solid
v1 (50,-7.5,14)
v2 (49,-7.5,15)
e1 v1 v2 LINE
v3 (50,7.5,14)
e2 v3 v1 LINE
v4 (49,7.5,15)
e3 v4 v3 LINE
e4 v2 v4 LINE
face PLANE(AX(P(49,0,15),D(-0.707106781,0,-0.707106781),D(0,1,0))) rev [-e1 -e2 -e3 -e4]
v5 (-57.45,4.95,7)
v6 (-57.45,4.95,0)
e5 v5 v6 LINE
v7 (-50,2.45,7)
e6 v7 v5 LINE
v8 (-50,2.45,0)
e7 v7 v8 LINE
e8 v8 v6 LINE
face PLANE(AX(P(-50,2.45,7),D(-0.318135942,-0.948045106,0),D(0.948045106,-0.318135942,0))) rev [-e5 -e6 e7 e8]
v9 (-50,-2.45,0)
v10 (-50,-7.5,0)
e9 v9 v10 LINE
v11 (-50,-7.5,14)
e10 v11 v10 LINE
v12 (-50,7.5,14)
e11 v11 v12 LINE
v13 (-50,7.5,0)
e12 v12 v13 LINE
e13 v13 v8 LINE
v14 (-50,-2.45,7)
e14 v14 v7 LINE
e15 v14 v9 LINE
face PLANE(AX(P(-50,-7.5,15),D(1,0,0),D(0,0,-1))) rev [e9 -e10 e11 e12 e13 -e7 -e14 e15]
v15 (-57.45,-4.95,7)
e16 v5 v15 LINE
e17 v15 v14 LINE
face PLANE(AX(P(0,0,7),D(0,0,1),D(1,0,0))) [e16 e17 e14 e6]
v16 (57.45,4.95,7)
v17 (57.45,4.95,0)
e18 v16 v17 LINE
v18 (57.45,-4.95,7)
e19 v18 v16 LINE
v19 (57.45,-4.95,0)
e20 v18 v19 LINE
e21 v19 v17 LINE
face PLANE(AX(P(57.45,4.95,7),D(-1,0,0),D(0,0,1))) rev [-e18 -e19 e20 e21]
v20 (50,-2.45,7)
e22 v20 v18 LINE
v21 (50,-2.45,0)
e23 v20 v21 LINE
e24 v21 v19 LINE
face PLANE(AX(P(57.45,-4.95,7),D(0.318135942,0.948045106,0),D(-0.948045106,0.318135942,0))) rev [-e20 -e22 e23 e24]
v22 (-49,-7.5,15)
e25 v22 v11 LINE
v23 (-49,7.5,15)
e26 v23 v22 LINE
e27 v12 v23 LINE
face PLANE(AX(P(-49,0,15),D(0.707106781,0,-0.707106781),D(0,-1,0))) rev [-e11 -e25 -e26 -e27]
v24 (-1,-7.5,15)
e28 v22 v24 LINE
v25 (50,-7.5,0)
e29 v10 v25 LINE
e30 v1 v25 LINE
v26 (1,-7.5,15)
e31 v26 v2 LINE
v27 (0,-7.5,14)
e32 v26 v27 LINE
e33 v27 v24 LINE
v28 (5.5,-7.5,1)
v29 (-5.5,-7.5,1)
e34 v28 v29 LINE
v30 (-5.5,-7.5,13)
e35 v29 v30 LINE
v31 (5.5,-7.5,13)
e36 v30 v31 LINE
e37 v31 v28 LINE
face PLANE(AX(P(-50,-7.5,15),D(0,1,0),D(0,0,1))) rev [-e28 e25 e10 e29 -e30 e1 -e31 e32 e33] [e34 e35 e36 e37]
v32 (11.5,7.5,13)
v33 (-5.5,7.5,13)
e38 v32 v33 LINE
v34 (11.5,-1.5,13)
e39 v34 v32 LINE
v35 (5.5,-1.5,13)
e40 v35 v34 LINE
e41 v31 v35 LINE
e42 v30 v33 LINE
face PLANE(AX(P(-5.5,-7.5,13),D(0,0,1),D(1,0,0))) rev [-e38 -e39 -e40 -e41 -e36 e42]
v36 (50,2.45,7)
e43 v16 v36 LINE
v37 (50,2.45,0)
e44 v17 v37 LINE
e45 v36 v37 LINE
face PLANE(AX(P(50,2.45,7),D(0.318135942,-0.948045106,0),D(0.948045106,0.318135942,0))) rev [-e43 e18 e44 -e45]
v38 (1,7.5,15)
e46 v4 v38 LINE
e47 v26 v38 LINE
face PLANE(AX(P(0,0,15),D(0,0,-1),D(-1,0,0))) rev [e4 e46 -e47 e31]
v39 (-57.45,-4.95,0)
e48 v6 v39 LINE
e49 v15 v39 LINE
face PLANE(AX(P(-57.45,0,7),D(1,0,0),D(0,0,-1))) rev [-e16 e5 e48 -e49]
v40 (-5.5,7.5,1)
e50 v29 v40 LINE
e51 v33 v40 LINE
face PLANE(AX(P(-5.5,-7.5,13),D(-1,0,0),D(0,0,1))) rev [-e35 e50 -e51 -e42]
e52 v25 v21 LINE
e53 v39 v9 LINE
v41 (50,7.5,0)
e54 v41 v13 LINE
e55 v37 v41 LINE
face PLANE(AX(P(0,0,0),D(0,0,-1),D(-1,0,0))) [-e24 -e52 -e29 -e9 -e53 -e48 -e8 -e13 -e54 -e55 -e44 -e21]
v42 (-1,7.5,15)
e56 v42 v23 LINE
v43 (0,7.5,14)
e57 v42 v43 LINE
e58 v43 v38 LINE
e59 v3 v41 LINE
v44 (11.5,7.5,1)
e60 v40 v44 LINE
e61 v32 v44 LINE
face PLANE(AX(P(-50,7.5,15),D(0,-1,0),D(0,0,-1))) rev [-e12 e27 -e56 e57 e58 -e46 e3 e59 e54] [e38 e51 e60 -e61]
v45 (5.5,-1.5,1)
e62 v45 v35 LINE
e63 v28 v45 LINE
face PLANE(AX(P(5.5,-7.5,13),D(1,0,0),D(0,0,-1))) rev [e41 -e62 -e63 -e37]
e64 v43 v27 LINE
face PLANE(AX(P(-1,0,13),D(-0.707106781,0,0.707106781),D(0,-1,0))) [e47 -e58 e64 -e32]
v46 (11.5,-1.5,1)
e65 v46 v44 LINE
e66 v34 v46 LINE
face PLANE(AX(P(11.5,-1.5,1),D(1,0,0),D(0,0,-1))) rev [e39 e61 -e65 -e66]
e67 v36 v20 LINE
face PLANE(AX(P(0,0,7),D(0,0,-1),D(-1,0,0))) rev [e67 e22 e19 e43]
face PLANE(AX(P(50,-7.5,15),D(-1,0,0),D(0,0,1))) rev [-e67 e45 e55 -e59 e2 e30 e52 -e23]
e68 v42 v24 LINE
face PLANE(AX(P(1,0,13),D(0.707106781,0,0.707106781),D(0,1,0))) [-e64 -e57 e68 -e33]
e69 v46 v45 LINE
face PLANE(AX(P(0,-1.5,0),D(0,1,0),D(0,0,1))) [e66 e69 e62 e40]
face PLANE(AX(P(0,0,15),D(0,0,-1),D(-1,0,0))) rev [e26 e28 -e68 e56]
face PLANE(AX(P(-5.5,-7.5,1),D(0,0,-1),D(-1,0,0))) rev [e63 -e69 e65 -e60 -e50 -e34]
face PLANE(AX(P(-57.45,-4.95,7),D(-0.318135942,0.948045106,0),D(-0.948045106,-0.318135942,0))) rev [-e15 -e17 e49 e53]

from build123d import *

# Parameters (mm, degrees)
SKETCH1_W               = 100
SKETCH1_H               = 15
BODY_DEPTH              = 15
CLICK_DEPTH             = 7
CLICK_CHAMFER_SIZE      = 1
SKETCH4_W               = 2
SKETCH4_H               = 15
FIELDMARK_DEPTH         = 2
FIELDMARK_CHAMFER_SIZE  = 2
CUT_EXTRUDE1_DEPTH      = 62.241346327
CUT_EXTRUDE1_DEPTH_BACK = 62.241346327
SKETCH5_W               = 11
SKETCH5_H               = 12
SKETCH6_W               = 17
SKETCH6_H               = 12
CUT_EXTRUDE2_DEPTH      = 9


with BuildPart() as part:
    # Sketch1 → Body (new body)
    with BuildSketch(Plane.XY):
        Rectangle(SKETCH1_W, SKETCH1_H)
    extrude(amount=BODY_DEPTH)

    # Sketch2 → Click (add)
    with BuildSketch(Plane.XY):
        Polygon((-50, 0), (-50, 2.45), (-57.45, 4.95), (-57.45, 0), (-57.45, -4.95), (-50, -2.45), align=None)
        Polygon((57.45, 0), (57.45, -4.95), (50, -2.45), (50, 0), (50, 2.45), (57.45, 4.95), align=None)
    extrude(amount=CLICK_DEPTH)

    # Click Chamfer
    click_chamfer_edges = [part.edges().sort_by_distance(p)[0] for p in [
        (-50, 0, 15),
        (50, 0, 15),
    ]]
    chamfer(click_chamfer_edges, length=CLICK_CHAMFER_SIZE)

    # Sketch4 → FieldMark (cut)
    with BuildSketch(Plane.XY.offset(15)):
        Rectangle(SKETCH4_W, SKETCH4_H)
    extrude(amount=-FIELDMARK_DEPTH, mode=Mode.SUBTRACT)

    # FieldMark Chamfer
    # the kernel refuses this chamfer: 2 mm, written as the material it adds along each edge
    with BuildSketch(Plane(origin=(1, -7.5, 13), x_dir=(0.02749587661058638, 0, 0.9996219169112968), z_dir=(0, 1, 0))) as fieldmark_chamfer_piece_1_section:
        Polygon((FIELDMARK_CHAMFER_SIZE * 0.999621916911, -FIELDMARK_CHAMFER_SIZE * 0.0274958766106), (-FIELDMARK_CHAMFER_SIZE * 0.0274958766106, -FIELDMARK_CHAMFER_SIZE * 0.999621916911), (0, 0), align=None)
    fieldmark_chamfer_piece_1 = extrude(amount=15, mode=Mode.PRIVATE)
    fieldmark_chamfer_piece_1 = split(fieldmark_chamfer_piece_1, bisect_by=Plane(origin=(0.339191691, 0, 15), z_dir=(0, 0, -1)), keep=Keep.TOP, mode=Mode.PRIVATE)
    add(fieldmark_chamfer_piece_1)
    with BuildSketch(Plane(origin=(-1, 7.5, 13), x_dir=(0.9996219169112968, 0, -0.027495876610586487), z_dir=(0, -1, 0))) as fieldmark_chamfer_piece_2_section:
        Polygon((FIELDMARK_CHAMFER_SIZE * 0.999621916911, FIELDMARK_CHAMFER_SIZE * 0.0274958766106), (-FIELDMARK_CHAMFER_SIZE * 0.0274958766106, FIELDMARK_CHAMFER_SIZE * 0.999621916911), (0, 0), align=None)
    fieldmark_chamfer_piece_2 = extrude(amount=15, mode=Mode.PRIVATE)
    fieldmark_chamfer_piece_2 = split(fieldmark_chamfer_piece_2, bisect_by=Plane(origin=(-0.339191691, 0, 15), z_dir=(0, 0, -1)), keep=Keep.TOP, mode=Mode.PRIVATE)
    add(fieldmark_chamfer_piece_2)

    # Sketch5 → Cut-Extrude1 (cut, two sides: drawn at the far end of the back side and taken through both)
    with BuildSketch(Plane(origin=(0, 7.5, 0), x_dir=(1, 0, 0), z_dir=(0, 1, 0)).offset(-CUT_EXTRUDE1_DEPTH_BACK)):
        with Locations((0, -7)):
            Rectangle(SKETCH5_W, SKETCH5_H)
    extrude(amount=CUT_EXTRUDE1_DEPTH + CUT_EXTRUDE1_DEPTH_BACK, mode=Mode.SUBTRACT)

    # Sketch6 → Cut-Extrude2 (cut)
    with BuildSketch(Plane(origin=(0, 7.5, 0), x_dir=(1, 0, 0), z_dir=(0, 1, 0))):
        with Locations((3, -7)):
            Rectangle(SKETCH6_W, SKETCH6_H)
    extrude(amount=-CUT_EXTRUDE2_DEPTH, mode=Mode.SUBTRACT)


solid = part.part
